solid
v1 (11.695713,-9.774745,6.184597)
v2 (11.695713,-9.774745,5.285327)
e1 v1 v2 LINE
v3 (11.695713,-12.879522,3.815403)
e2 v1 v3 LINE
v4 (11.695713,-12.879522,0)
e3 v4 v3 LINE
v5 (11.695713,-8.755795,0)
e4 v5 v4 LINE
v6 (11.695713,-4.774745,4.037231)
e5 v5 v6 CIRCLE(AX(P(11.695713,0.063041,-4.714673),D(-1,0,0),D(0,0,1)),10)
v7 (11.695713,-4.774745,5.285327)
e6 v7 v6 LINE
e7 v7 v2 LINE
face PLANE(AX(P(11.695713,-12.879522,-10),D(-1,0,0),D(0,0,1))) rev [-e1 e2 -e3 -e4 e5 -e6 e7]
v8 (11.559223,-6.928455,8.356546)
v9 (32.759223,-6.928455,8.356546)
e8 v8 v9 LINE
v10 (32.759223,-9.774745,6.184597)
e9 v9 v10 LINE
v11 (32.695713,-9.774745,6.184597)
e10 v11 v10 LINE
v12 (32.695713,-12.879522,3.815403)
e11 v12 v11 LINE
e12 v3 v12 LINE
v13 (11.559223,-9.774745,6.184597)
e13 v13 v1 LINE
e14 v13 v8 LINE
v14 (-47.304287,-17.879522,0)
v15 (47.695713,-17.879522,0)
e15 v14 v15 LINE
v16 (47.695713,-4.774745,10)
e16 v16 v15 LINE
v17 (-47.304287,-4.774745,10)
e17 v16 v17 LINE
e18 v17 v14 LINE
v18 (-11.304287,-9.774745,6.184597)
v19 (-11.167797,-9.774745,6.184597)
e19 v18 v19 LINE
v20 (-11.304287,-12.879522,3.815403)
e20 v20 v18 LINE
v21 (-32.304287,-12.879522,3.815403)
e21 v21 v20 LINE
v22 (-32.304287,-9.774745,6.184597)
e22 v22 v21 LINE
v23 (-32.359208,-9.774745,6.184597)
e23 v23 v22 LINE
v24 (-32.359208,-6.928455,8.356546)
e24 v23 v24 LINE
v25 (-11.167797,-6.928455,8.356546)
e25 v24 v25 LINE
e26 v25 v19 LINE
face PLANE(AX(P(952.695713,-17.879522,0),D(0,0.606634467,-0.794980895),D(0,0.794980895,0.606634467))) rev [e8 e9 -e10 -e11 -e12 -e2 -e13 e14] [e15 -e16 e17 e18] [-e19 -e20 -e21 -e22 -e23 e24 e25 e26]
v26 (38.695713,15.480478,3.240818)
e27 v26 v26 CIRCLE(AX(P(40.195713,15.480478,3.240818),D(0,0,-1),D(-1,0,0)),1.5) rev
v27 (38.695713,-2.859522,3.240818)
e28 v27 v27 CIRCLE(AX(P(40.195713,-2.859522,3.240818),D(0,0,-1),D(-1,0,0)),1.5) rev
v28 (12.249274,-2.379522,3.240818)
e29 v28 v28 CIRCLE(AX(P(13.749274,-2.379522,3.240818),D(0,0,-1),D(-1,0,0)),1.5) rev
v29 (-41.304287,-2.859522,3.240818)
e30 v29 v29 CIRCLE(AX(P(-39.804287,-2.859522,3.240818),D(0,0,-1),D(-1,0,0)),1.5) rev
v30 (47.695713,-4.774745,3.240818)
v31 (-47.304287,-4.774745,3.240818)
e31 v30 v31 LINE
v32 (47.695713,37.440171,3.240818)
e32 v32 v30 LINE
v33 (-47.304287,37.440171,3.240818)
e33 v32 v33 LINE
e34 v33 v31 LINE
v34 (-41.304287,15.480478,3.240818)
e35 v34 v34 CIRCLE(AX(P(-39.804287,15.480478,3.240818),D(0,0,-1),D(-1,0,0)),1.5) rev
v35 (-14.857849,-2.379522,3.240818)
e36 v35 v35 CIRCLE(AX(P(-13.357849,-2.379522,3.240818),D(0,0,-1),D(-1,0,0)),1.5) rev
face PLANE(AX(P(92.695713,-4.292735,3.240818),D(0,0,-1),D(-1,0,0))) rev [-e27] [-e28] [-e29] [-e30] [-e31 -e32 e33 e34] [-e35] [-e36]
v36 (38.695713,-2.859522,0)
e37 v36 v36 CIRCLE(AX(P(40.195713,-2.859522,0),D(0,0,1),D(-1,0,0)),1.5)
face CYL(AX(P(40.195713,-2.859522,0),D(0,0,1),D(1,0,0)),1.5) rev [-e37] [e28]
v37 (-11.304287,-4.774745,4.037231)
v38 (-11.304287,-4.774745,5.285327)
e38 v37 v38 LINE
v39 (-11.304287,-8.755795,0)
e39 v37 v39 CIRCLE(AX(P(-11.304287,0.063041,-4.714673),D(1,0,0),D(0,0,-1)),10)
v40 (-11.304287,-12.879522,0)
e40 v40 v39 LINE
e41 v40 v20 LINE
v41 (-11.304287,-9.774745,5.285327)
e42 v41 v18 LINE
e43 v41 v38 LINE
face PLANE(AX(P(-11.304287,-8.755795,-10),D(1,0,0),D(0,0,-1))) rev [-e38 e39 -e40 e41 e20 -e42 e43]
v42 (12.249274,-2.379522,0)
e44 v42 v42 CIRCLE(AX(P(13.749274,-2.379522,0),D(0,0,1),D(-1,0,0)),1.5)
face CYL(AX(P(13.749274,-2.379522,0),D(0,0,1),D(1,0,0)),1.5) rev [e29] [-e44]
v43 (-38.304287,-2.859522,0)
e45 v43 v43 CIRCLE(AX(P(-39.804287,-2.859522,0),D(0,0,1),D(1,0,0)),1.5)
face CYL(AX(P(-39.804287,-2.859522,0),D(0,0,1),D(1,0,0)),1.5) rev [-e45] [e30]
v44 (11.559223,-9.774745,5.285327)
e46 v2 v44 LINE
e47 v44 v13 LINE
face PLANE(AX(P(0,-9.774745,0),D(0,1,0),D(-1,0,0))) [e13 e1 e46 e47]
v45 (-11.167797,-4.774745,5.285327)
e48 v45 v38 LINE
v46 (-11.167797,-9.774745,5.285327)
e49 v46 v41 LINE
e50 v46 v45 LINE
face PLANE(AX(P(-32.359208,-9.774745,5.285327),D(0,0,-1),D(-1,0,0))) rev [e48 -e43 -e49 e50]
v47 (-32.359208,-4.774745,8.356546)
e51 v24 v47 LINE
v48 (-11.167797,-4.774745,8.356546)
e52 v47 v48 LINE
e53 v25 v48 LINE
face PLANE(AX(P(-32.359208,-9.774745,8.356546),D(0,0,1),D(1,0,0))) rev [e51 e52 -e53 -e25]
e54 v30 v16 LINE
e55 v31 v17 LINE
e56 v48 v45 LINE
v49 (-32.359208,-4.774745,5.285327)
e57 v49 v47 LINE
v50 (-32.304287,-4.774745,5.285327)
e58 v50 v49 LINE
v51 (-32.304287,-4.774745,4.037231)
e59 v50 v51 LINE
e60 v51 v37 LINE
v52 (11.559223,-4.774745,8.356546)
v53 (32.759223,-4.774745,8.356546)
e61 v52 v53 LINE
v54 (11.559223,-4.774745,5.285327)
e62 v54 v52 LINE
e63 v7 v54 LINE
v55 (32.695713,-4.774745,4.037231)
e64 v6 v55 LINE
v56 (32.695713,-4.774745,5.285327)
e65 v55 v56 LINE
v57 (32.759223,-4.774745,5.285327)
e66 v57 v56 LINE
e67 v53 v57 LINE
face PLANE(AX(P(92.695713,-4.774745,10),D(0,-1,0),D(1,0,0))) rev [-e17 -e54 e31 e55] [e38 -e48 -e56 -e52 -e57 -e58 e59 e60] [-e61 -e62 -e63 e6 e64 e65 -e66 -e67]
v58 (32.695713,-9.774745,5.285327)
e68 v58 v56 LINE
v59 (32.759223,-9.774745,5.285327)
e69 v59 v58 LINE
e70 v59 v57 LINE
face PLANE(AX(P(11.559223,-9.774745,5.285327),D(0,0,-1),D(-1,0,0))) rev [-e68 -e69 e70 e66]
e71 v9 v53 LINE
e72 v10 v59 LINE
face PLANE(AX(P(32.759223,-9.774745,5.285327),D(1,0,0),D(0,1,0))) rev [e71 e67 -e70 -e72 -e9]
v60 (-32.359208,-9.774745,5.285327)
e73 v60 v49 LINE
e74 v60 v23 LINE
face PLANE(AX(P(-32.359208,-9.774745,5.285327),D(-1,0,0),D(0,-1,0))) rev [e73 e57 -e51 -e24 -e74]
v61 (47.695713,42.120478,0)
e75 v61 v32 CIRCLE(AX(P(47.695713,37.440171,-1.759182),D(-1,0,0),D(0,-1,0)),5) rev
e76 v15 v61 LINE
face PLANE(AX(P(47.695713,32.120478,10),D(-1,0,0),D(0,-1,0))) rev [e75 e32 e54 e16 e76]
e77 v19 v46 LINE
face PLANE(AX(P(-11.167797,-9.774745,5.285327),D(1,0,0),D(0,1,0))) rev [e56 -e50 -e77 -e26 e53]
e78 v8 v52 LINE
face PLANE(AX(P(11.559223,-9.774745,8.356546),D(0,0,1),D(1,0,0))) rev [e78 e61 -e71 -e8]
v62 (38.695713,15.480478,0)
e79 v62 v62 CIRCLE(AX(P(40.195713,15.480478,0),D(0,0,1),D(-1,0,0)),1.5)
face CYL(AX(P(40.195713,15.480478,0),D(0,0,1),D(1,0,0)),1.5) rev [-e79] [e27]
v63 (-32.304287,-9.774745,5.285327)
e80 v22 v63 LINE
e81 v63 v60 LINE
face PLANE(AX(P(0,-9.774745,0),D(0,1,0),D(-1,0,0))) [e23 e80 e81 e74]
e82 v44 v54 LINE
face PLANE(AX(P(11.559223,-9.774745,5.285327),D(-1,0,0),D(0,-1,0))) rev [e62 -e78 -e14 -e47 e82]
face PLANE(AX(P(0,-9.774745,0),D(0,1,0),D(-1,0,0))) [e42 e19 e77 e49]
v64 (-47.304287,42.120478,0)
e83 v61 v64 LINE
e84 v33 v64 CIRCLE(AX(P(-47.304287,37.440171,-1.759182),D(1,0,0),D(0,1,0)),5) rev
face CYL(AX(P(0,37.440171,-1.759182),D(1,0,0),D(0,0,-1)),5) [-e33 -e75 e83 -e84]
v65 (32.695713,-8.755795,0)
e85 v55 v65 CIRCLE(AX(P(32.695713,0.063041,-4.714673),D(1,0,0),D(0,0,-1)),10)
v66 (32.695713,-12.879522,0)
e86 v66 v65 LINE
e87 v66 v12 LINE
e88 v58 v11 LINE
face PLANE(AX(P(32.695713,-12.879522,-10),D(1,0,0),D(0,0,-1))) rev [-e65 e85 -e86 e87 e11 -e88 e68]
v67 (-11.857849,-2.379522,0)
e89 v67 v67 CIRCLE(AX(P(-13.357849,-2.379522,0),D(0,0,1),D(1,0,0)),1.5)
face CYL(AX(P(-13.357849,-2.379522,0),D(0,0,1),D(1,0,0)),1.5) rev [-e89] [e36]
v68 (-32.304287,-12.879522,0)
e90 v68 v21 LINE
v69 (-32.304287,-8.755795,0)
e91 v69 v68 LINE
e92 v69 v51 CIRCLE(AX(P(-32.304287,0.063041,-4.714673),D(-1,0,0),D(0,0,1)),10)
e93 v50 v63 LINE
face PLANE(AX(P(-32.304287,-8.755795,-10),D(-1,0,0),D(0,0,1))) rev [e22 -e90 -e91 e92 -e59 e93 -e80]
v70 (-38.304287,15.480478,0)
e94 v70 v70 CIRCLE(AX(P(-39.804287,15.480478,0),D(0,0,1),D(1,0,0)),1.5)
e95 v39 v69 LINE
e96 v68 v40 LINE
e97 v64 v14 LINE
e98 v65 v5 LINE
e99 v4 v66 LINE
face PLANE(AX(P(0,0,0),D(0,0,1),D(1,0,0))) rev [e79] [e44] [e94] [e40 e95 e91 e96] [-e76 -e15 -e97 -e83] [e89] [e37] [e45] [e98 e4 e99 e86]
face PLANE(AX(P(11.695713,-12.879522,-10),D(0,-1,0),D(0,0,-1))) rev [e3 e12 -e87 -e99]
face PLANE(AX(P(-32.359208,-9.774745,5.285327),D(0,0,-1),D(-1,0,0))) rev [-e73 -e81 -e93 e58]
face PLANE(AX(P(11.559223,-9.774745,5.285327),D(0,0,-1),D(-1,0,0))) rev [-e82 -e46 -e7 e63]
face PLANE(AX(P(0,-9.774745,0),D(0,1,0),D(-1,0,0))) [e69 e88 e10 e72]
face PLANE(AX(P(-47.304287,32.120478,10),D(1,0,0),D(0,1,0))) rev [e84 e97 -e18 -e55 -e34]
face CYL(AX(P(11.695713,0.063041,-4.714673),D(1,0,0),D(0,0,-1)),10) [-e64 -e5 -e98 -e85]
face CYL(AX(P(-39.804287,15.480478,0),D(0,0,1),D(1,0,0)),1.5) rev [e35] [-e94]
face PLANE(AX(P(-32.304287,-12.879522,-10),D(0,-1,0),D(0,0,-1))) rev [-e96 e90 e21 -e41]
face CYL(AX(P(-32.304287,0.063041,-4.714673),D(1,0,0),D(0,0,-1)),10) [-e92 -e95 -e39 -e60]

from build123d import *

# Parameters (mm, degrees)
CROQUIS1_W              = 95
CROQUIS1_H              = 50
SALIENTE_EXTRUIR1_DEPTH = 10
CROQUIS2_W              = 21
CROQUIS2_H              = 4.123726598
CORTAR_EXTRUIR1_DEPTH   = 20
CORTAR_EXTRUIR2_DEPTH   = 1000
REDONDEO1_R             = 5
CROQUIS5_R              = 1.5
CORTAR_EXTRUIR3_DEPTH   = 10
CORTAR_EXTRUIR4_DEPTH   = 140
CROQUIS8_W              = 21.19141069
CROQUIS8_H              = 3.071218941
CROQUIS8_W_2            = 21.2
CORTAR_EXTRUIR5_DEPTH   = 5
REDONDEO2_R             = 10
REDONDEO3_R             = 10
CROQUIS9_W              = 95
CROQUIS9_H              = 3.240818253
SALIENTE_EXTRUIR2_DEPTH = 10
REDONDEO4_R             = 5


with BuildPart() as part:
    # Croquis1 → Saliente-Extruir1 (new body)
    with BuildSketch(Plane.XY):
        with Locations((0.195712782, 7.120478413)):
            Rectangle(CROQUIS1_W, CROQUIS1_H)
    extrude(amount=SALIENTE_EXTRUIR1_DEPTH)

    # Croquis2 → Cortar-Extruir1 (cut)
    with BuildSketch(Plane.XY.offset(10)):
        with Locations((-21.804287218, -10.817658288)):
            Rectangle(CROQUIS2_W, CROQUIS2_H)
        with Locations((22.195712782, -10.817658288)):
            Rectangle(CROQUIS2_W, CROQUIS2_H)
    extrude(amount=-CORTAR_EXTRUIR1_DEPTH, mode=Mode.SUBTRACT)

    # Croquis3 → Cortar-Extruir2 (cut)
    with BuildSketch(Plane.ZY.offset(47.304287218)):
        Polygon((0, -17.879521587), (10, -4.774745355), (10, -17.879521587), align=None)
    extrude(amount=-CORTAR_EXTRUIR2_DEPTH, mode=Mode.SUBTRACT)

    # Redondeo1
    redondeo1_edges = [part.edges().sort_by_distance(p)[0] for p in [
        (0.195712782, 32.120478413, 10),
    ]]
    fillet(redondeo1_edges, radius=REDONDEO1_R)

    # Croquis5 → Cortar-Extruir3 (cut)
    with BuildSketch(Plane.XY.offset(10)):
        with Locations((-39.804287218, 15.480478413)):
            Circle(CROQUIS5_R)
        with Locations(Location((40.195712782, 15.480478413, 0), (0, 0, 180))):
            Circle(CROQUIS5_R)
        with Locations((-13.357848867, -2.379521587)):
            Circle(CROQUIS5_R)
        with Locations(Location((13.749274431, -2.379521587, 0), (0, 0, 180))):
            Circle(CROQUIS5_R)
        with Locations((-39.804287218, -2.859521587)):
            Circle(CROQUIS5_R)
        with Locations(Location((40.195712782, -2.859521587, 0), (0, 0, 180))):
            Circle(CROQUIS5_R)
    extrude(amount=-CORTAR_EXTRUIR3_DEPTH, mode=Mode.SUBTRACT)

    # Croquis7 → Cortar-Extruir4 (cut)
    with BuildSketch(Plane.ZY.offset(47.304287218)):
        Polygon((10, -4.774745355), (4.790814809, -4.774745355), (3.240818253, -4.774745355), (3.240818253, -4.292734616), (3.240818253, 32.120478413), (5, 32.120478413), (10, 32.120478413), align=None)
    extrude(amount=-CORTAR_EXTRUIR4_DEPTH, mode=Mode.SUBTRACT)

    # Croquis8 → Cortar-Extruir5 (cut)
    with BuildSketch(Plane(origin=(0, -4.774745355, 0), x_dir=(1, 0, 0), z_dir=(0, 1, 0))):
        with Locations((-21.763502643, -6.820936578)):
            Rectangle(CROQUIS8_W, CROQUIS8_H)
        with Locations((22.159222862, -6.820936578)):
            Rectangle(CROQUIS8_W_2, CROQUIS8_H)
    extrude(amount=-CORTAR_EXTRUIR5_DEPTH, mode=Mode.SUBTRACT)

    # Redondeo2
    # the kernel refuses this fillet: 10 mm, written as the material it takes off along each edge
    with BuildSketch(Plane(origin=(-11.304287218, -8.755794989, 5.285327107), x_dir=(0, 0, -1), z_dir=(-1, 0, 0))) as redondeo2_piece_1:
        with BuildLine():
            CenterArc((10, -8.818835496), REDONDEO2_R, 118.129583681, 61.870416319)
            Line((0, -8.818835496), (-0.2, -8.818835496))
            Line((-0.2, -8.818835496), (-0.2, 0))
            Line((-0.2, 0), (0, 0.2))
            ThreePointArc((0, 0.2), (2.642663554, 0.2), (5.191033649, 0.17637671))
            Line((5.191033649, 0.17637671), (5.285327107, 0))
        make_face()
    extrude(amount=21, mode=Mode.SUBTRACT)

    # Redondeo3
    # the kernel refuses this fillet: 10 mm, written as the material it takes off along each edge
    with BuildSketch(Plane(origin=(11.695712782, -8.755794989, 5.285327107), x_dir=(0, 0, -1), z_dir=(1, 0, 0))) as redondeo3_piece_1:
        with BuildLine():
            CenterArc((10, 8.818835496), REDONDEO3_R, 180, 61.870416319)
            Line((0, 8.818835496), (-0.2, 8.818835496))
            Line((-0.2, 8.818835496), (-0.2, 0))
            Line((-0.2, 0), (0, -0.2))
            ThreePointArc((0, -0.2), (2.642663554, -0.2), (5.191033649, -0.17637671))
            Line((5.191033649, -0.17637671), (5.285327107, 0))
        make_face()
    extrude(amount=21, mode=Mode.SUBTRACT)

    # Croquis9 → Saliente-Extruir2 (add)
    with BuildSketch(Plane(origin=(0, 32.120478413, 0), x_dir=(1, 0, 0), z_dir=(0, 1, 0))):
        with Locations((0.195712782, -1.620409127)):
            Rectangle(CROQUIS9_W, CROQUIS9_H)
    extrude(amount=SALIENTE_EXTRUIR2_DEPTH)

    # Redondeo4
    # the kernel refuses this fillet: 5 mm, written as the material it takes off along each edge
    with BuildSketch(Plane(origin=(59.396481876, 42.120478413, 3.240818253), x_dir=(0, 0, -1), z_dir=(-1, 0, 0))) as redondeo4_piece_1:
        with BuildLine():
            CenterArc((5, 4.680307637), REDONDEO4_R, 180, 69.400324349)
            Line((0, 4.680307637), (-0.1, 4.680307637))
            Line((-0.1, 4.680307637), (-0.1, 0))
            Line((-0.1, 0), (0, -0.1))
            ThreePointArc((0, -0.1), (1.620409126, -0.1), (3.205634618, -0.093606153))
            Line((3.205634618, -0.093606153), (3.240818253, 0))
        make_face()
    extrude(amount=118.401538187, mode=Mode.SUBTRACT)


solid = part.part
